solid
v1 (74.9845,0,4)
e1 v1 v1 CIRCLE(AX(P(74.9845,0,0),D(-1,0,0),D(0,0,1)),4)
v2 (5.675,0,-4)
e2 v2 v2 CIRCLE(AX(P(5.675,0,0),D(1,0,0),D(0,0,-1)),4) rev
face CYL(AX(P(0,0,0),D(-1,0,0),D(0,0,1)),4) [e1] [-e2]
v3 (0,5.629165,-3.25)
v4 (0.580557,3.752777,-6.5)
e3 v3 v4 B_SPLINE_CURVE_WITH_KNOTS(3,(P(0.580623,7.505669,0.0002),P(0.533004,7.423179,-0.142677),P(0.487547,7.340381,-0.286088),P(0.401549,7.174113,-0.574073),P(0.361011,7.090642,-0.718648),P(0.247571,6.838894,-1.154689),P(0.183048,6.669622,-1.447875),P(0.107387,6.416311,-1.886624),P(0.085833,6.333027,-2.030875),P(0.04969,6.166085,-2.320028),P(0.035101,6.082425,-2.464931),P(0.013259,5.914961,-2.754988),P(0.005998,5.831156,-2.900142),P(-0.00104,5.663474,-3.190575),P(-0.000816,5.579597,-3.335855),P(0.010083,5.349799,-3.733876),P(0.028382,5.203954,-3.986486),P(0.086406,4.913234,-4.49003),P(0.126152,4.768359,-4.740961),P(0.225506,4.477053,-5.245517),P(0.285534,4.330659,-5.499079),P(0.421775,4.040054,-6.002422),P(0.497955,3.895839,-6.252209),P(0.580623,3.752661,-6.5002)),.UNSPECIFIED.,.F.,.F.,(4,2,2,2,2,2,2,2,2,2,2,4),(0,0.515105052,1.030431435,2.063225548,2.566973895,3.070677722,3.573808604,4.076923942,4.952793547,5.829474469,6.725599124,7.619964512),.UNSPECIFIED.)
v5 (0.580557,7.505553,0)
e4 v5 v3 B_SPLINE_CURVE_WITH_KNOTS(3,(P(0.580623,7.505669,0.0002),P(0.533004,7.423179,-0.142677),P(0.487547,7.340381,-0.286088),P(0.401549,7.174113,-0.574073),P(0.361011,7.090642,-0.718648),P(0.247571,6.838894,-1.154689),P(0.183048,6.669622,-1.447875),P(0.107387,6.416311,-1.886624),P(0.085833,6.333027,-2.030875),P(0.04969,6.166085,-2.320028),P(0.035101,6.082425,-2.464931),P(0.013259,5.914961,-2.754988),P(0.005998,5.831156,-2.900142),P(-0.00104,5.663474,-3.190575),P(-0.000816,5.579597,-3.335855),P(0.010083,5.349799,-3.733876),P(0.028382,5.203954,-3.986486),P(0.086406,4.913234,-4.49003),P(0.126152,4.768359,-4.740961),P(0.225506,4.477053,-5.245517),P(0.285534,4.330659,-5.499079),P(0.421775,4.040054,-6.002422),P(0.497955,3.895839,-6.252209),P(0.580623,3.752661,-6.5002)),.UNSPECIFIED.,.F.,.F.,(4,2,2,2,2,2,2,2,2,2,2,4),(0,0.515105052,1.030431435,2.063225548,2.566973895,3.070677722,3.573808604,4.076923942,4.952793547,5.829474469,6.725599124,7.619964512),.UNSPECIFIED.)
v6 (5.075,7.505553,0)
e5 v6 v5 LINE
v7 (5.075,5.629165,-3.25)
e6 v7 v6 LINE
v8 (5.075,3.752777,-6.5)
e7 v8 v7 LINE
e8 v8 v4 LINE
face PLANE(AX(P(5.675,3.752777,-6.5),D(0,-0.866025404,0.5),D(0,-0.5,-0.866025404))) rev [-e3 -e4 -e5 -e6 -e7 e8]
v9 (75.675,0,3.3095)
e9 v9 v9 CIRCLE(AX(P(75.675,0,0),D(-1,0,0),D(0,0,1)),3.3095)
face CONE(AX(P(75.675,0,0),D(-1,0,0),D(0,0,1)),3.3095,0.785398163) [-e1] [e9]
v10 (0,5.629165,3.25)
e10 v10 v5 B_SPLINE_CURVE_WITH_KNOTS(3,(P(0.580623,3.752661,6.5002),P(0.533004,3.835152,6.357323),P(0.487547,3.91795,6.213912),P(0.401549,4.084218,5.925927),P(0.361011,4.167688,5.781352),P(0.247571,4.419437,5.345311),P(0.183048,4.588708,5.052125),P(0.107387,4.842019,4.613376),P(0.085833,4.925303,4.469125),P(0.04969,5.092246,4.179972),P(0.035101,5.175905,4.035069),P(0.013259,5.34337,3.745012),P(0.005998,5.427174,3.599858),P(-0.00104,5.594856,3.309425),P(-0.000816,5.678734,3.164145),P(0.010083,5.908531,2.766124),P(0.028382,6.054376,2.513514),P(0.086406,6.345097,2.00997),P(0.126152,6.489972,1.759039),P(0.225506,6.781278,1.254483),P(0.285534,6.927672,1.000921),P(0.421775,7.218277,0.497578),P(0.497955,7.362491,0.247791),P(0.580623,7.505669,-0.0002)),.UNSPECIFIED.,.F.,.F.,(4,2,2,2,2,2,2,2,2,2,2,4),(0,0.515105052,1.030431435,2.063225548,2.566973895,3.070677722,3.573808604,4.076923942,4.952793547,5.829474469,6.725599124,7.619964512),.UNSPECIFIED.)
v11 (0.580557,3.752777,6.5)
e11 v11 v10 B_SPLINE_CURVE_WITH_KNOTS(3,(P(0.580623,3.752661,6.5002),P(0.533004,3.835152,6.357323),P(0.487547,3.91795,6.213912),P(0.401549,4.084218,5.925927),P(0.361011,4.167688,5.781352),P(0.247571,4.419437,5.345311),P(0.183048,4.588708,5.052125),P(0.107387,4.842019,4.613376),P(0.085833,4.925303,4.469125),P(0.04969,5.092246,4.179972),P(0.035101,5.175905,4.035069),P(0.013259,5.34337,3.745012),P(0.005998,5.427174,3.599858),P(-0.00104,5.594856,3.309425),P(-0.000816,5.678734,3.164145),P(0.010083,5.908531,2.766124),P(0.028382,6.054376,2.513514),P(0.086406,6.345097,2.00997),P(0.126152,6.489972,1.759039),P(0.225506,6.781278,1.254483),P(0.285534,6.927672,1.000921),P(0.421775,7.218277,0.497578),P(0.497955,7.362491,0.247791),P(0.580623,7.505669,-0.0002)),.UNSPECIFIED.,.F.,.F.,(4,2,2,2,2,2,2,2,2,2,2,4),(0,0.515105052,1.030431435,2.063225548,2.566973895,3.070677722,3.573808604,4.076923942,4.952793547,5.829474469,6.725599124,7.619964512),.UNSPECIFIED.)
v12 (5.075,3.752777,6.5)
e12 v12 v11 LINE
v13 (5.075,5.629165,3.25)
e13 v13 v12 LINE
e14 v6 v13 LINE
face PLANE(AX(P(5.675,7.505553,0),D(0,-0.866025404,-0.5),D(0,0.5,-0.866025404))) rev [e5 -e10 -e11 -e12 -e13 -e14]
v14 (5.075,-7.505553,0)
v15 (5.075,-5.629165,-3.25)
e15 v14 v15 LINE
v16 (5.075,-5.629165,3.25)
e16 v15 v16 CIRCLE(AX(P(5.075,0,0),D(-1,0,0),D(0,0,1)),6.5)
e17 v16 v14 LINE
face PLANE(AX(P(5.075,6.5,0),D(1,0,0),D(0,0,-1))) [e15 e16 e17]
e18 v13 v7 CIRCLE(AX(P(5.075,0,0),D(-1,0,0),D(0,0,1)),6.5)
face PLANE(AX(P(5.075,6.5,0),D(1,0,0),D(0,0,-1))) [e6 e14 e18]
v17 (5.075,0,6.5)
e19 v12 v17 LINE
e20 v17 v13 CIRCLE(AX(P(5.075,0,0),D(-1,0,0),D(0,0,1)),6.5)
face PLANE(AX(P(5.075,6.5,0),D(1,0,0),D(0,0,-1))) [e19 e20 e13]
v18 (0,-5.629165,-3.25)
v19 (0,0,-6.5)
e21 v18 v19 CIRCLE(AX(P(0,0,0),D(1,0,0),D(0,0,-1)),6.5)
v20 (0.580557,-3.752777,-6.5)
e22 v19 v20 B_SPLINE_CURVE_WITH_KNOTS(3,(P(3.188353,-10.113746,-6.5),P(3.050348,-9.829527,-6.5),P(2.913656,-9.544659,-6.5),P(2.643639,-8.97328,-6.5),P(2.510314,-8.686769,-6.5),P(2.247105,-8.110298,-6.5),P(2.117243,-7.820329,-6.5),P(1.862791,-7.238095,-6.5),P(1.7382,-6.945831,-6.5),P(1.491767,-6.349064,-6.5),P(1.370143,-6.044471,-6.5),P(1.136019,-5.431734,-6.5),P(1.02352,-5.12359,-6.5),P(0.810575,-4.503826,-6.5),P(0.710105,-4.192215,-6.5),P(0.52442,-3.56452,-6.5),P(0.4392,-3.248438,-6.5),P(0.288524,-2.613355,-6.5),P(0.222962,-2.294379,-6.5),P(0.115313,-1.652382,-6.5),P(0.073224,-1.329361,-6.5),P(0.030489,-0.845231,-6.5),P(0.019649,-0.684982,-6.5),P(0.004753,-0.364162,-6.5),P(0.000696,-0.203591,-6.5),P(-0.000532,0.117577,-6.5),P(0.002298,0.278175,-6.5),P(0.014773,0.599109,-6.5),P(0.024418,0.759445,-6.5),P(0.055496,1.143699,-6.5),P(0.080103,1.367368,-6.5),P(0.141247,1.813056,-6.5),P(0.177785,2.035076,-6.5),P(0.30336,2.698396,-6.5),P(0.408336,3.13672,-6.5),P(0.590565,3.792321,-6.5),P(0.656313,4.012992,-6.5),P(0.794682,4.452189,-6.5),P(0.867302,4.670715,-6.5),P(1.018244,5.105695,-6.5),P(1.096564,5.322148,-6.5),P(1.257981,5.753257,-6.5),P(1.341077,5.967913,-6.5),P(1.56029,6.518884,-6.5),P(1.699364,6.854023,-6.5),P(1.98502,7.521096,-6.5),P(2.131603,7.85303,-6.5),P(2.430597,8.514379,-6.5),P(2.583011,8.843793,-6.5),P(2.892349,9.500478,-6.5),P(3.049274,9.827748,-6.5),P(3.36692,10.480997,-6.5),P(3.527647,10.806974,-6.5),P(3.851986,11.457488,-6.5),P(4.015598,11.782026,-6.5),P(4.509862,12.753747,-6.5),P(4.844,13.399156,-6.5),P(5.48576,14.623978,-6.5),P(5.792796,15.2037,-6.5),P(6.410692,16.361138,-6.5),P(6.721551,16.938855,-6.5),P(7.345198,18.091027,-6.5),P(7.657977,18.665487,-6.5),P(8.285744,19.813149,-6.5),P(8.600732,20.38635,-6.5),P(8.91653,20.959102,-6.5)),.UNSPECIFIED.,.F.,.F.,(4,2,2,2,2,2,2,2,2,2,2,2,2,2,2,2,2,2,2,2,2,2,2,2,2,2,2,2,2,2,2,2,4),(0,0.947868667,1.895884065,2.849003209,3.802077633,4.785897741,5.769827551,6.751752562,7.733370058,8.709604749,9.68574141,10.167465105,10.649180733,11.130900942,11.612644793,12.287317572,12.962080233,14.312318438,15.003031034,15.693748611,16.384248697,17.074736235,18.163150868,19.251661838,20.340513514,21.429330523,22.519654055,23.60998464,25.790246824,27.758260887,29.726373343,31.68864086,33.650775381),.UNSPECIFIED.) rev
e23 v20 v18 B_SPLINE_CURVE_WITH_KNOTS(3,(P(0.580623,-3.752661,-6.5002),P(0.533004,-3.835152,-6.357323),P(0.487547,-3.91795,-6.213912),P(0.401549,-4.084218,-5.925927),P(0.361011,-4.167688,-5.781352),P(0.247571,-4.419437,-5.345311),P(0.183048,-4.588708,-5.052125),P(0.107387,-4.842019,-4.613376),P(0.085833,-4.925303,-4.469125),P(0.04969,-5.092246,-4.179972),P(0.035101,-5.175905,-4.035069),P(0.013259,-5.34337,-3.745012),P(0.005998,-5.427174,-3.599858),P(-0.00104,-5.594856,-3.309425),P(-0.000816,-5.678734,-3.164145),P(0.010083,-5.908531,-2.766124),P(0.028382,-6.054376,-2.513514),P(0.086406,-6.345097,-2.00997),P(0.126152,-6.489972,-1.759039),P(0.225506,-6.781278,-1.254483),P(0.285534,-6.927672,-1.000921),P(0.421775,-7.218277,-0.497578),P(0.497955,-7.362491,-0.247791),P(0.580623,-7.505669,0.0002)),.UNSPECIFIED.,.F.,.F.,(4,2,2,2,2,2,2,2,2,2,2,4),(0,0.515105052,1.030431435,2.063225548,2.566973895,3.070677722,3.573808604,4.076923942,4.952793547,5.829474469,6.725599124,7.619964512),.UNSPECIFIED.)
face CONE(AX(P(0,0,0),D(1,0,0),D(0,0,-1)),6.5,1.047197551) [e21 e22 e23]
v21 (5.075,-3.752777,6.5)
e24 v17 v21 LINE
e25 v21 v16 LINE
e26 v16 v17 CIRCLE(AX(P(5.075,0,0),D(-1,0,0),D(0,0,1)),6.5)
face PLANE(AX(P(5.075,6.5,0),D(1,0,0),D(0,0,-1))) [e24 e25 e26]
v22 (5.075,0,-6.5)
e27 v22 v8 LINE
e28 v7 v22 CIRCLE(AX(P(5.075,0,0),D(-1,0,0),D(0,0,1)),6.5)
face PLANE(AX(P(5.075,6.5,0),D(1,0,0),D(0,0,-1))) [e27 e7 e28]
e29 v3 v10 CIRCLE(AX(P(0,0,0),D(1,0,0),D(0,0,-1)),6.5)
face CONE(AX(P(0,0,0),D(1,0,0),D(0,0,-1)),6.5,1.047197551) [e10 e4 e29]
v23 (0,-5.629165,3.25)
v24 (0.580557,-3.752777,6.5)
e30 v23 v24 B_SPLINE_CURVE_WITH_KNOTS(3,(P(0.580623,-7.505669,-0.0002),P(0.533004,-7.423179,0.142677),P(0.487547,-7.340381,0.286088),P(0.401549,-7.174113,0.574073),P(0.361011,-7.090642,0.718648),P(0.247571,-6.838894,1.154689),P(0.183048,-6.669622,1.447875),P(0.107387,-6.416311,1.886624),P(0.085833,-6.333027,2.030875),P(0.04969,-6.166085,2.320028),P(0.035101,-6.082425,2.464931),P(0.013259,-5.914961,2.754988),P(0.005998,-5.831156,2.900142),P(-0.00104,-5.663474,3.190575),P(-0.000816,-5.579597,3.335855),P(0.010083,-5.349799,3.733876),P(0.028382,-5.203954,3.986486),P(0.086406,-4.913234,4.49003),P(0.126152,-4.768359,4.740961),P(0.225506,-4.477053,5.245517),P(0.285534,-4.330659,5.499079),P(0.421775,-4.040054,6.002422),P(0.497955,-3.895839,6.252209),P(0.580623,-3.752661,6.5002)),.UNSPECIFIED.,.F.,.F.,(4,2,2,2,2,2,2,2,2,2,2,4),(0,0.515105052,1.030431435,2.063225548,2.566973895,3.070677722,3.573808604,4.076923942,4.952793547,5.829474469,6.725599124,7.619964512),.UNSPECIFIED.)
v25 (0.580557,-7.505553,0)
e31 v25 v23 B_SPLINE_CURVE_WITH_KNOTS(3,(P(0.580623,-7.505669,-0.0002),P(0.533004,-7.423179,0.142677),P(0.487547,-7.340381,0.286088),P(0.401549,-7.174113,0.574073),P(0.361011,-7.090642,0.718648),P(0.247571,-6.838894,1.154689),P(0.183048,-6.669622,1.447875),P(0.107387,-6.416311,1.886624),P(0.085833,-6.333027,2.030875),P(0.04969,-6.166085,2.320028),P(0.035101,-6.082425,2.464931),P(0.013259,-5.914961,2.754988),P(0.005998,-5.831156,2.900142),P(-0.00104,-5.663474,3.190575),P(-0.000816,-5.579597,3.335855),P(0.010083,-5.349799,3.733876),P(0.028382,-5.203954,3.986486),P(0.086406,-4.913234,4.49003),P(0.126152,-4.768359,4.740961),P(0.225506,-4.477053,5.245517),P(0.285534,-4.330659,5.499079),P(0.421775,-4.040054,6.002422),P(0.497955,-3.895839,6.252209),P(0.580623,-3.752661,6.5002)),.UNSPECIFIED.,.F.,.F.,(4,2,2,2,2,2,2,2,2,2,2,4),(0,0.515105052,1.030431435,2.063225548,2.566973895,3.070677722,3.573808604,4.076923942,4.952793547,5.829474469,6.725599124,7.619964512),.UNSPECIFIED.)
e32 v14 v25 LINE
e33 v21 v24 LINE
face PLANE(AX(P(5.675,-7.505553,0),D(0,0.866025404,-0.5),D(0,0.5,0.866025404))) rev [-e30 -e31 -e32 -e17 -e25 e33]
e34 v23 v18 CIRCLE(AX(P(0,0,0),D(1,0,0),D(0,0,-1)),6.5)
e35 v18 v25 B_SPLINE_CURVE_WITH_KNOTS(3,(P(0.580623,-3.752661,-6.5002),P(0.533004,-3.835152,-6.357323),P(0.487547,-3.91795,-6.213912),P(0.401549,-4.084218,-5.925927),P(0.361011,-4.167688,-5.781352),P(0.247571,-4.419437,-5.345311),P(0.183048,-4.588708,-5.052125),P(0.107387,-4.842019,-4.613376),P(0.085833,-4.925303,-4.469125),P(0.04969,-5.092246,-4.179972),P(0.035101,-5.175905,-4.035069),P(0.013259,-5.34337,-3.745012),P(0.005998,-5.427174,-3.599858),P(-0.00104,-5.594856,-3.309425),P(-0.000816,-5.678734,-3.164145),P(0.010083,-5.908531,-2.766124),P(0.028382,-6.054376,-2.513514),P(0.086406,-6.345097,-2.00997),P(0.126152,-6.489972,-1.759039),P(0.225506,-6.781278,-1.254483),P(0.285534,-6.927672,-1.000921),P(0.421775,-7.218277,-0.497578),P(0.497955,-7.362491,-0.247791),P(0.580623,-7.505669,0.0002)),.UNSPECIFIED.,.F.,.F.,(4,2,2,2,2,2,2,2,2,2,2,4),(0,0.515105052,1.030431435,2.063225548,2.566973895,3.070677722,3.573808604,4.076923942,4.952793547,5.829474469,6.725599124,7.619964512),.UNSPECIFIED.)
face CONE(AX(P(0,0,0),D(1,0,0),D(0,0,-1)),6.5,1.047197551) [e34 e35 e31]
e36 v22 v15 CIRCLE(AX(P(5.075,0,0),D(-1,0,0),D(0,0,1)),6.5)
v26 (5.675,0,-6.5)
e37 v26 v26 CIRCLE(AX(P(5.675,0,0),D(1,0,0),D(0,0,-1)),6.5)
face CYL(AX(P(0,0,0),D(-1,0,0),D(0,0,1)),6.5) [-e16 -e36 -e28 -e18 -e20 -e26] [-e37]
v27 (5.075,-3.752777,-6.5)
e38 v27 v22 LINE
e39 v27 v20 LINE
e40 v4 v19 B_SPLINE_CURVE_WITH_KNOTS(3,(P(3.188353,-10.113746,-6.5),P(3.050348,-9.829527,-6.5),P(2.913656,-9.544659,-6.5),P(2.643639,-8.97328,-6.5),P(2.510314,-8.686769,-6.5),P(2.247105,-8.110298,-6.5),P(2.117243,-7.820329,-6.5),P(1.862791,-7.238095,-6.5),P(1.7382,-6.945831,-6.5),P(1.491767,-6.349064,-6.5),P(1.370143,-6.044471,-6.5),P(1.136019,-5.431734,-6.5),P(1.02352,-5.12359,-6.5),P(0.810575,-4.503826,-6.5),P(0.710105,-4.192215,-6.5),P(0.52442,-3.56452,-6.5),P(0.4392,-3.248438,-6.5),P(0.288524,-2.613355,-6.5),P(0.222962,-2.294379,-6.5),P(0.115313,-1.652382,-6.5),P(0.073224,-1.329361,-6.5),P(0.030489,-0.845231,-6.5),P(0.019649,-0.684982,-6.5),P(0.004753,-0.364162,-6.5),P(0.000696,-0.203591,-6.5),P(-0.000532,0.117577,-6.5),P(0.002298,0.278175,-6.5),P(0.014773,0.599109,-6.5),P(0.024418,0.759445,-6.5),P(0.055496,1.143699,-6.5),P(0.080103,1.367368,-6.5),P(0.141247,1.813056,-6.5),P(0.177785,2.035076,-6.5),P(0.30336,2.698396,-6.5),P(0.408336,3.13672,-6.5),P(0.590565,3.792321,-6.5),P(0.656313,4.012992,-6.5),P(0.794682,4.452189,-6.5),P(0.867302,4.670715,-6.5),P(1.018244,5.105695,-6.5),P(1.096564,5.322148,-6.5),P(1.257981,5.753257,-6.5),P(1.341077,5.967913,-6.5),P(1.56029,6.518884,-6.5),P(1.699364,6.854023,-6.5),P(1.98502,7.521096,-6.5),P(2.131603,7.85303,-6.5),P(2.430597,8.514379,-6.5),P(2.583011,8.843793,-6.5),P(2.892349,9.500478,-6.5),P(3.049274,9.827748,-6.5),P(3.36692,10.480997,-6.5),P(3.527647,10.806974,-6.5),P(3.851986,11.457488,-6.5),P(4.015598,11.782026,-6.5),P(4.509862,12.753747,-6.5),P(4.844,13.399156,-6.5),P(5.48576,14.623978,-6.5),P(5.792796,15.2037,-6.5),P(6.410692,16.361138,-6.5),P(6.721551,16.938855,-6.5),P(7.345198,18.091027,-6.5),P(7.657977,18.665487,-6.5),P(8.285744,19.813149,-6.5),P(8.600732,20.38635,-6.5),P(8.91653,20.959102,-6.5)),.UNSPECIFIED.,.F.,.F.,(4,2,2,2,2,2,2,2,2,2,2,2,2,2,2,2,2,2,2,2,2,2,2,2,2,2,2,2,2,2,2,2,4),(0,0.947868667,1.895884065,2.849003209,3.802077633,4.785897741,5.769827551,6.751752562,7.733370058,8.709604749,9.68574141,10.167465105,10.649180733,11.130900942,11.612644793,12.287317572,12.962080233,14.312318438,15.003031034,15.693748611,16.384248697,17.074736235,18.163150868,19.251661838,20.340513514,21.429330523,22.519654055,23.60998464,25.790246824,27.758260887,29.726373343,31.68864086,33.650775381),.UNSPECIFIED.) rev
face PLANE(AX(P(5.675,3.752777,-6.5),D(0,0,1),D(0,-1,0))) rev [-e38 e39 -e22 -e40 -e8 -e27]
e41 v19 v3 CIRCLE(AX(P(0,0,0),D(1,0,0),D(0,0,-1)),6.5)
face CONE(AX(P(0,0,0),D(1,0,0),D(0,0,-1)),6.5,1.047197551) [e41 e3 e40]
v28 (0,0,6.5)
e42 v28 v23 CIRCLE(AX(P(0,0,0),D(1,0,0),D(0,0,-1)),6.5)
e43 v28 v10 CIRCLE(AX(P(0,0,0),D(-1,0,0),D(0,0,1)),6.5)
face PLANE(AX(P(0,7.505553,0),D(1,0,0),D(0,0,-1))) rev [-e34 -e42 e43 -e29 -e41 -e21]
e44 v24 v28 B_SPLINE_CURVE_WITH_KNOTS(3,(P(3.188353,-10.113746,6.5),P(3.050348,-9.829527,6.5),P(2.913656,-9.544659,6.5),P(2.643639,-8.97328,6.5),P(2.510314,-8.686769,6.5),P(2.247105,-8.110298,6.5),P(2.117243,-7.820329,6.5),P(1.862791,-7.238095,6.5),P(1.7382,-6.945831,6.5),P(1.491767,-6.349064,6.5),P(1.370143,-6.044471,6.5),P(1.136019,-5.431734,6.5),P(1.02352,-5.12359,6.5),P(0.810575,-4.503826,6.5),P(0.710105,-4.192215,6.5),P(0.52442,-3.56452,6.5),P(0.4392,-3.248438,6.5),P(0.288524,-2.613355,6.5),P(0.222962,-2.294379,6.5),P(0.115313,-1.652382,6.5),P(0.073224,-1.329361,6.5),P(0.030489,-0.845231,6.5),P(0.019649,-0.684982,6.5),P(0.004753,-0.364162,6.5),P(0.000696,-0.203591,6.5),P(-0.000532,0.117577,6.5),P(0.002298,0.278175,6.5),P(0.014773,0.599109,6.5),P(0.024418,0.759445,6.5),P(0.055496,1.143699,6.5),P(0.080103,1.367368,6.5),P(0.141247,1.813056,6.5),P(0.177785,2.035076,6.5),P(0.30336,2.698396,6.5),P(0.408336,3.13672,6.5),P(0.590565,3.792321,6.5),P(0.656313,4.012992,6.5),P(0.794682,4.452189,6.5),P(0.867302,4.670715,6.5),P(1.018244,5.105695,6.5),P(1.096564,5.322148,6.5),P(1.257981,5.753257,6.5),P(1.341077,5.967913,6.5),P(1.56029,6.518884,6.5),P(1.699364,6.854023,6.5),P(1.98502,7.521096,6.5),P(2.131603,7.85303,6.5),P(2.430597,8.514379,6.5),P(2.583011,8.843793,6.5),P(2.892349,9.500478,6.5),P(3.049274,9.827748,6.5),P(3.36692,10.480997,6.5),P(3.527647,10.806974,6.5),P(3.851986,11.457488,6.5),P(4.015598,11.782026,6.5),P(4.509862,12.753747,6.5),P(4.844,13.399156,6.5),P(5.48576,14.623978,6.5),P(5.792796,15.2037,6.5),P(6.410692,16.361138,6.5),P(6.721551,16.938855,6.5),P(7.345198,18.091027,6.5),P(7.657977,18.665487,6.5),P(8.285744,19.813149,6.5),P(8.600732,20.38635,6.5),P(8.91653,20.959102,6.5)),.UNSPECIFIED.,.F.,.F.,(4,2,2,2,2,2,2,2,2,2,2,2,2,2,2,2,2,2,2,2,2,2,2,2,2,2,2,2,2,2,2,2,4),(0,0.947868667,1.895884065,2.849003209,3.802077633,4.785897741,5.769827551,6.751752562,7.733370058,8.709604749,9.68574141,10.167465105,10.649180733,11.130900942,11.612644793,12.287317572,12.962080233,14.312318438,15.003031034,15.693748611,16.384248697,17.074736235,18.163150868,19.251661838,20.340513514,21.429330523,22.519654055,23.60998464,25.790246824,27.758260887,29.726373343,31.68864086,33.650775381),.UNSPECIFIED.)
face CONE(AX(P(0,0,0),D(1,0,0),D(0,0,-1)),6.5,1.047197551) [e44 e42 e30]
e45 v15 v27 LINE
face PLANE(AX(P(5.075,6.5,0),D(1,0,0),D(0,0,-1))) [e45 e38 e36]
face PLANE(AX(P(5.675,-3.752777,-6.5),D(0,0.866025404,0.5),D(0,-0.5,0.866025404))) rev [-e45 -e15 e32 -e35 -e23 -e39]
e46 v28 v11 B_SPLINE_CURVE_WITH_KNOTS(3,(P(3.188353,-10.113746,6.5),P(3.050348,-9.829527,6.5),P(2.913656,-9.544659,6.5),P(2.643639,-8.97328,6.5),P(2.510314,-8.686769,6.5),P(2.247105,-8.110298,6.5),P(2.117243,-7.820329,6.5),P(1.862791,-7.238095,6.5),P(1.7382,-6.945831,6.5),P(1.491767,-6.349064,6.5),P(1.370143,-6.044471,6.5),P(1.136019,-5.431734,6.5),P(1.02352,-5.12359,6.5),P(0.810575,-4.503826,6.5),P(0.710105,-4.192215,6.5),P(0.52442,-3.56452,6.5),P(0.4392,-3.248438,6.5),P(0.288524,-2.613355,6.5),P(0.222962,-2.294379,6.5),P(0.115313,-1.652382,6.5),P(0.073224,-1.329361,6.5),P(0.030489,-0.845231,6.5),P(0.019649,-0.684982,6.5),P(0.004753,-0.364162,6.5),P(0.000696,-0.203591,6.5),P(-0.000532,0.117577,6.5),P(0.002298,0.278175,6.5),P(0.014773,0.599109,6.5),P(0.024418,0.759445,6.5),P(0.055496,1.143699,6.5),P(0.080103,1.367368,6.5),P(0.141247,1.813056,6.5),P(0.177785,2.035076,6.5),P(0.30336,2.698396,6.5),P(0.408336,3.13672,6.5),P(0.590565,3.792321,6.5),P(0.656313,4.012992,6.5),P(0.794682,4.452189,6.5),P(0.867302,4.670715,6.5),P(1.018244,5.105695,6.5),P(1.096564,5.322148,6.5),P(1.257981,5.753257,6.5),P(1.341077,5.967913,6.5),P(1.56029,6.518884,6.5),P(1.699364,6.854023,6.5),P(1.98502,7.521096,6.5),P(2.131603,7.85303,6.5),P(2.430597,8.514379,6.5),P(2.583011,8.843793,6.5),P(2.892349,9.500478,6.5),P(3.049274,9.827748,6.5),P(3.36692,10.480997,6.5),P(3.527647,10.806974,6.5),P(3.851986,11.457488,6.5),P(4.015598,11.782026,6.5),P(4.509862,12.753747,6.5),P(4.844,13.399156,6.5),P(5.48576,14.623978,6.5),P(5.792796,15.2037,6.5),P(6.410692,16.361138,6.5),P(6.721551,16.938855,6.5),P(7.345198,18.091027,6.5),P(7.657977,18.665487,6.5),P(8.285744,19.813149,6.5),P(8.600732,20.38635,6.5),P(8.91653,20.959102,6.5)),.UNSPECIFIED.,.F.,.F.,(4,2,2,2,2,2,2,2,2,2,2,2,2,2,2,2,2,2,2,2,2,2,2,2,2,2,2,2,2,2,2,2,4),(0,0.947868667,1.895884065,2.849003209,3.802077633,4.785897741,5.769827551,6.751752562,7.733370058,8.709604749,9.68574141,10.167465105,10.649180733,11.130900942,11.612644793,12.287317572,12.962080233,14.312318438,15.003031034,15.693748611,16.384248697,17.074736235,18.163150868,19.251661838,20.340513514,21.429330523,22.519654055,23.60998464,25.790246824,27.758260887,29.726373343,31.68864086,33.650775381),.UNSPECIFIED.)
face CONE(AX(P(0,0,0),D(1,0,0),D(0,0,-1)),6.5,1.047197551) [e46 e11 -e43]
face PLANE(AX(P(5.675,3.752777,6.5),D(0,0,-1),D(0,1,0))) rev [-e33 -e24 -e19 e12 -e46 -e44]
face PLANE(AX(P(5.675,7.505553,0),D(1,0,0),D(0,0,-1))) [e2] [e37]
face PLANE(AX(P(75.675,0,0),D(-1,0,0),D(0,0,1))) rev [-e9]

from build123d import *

# Parameters (mm, degrees)
BASEHEAD_DEPTH = 5.675
SKETCH4_W      = 0.6
SKETCH4_H      = 11.005553499


# Read off the part's stored shape, not the designer's step: HeadChamfer
with BuildPart() as part:
    # Sketch1 → BaseHead (new body)
    with BuildSketch(Plane(origin=(0, 0, 0), x_dir=(0, 0, -1), z_dir=(1, 0, 0))):
        Polygon((6.5, 3.75277675), (6.5, -3.75277675), (0, -7.505553499), (-6.5, -3.75277675), (-6.5, 3.75277675), (0, 7.505553499), align=None)
    extrude(amount=BASEHEAD_DEPTH)

    # HeadChamfer outline → HeadChamfer (revolve, cut)
    with BuildSketch(Plane.YX):
        Polygon((7.505553503, 0.580556586), (6.499999425, -3.32e-07), (7.505553503, -1.347e-06), align=None)
    revolve(axis=Axis((0, 0, 0), (1, 0, 0)), mode=Mode.SUBTRACT)

    # HeadChamfer 2 outline → HeadChamfer 2 (revolve)
    with BuildSketch(Plane.YX):
        Polygon((4, 5.675), (4, 74.9845), (3.3095, 75.675), (0, 75.675), (0, 5.675), align=None)
    revolve(axis=Axis((0, 0, 0), (1, 0, 0)))

    # Sketch4 → BearingFace (revolve, cut)
    with BuildSketch(Plane.XY, mode=Mode.PRIVATE) as bearingface_sk:
        with Locations((5.375, 12.00277675)):
            Rectangle(SKETCH4_W, SKETCH4_H)
    revolve(bearingface_sk.sketch.rotate(Axis((0, 0, 0), (1, 0, 0)), 90), axis=Axis((0, 0, 0), (1, 0, 0)), mode=Mode.SUBTRACT)


solid = part.part
